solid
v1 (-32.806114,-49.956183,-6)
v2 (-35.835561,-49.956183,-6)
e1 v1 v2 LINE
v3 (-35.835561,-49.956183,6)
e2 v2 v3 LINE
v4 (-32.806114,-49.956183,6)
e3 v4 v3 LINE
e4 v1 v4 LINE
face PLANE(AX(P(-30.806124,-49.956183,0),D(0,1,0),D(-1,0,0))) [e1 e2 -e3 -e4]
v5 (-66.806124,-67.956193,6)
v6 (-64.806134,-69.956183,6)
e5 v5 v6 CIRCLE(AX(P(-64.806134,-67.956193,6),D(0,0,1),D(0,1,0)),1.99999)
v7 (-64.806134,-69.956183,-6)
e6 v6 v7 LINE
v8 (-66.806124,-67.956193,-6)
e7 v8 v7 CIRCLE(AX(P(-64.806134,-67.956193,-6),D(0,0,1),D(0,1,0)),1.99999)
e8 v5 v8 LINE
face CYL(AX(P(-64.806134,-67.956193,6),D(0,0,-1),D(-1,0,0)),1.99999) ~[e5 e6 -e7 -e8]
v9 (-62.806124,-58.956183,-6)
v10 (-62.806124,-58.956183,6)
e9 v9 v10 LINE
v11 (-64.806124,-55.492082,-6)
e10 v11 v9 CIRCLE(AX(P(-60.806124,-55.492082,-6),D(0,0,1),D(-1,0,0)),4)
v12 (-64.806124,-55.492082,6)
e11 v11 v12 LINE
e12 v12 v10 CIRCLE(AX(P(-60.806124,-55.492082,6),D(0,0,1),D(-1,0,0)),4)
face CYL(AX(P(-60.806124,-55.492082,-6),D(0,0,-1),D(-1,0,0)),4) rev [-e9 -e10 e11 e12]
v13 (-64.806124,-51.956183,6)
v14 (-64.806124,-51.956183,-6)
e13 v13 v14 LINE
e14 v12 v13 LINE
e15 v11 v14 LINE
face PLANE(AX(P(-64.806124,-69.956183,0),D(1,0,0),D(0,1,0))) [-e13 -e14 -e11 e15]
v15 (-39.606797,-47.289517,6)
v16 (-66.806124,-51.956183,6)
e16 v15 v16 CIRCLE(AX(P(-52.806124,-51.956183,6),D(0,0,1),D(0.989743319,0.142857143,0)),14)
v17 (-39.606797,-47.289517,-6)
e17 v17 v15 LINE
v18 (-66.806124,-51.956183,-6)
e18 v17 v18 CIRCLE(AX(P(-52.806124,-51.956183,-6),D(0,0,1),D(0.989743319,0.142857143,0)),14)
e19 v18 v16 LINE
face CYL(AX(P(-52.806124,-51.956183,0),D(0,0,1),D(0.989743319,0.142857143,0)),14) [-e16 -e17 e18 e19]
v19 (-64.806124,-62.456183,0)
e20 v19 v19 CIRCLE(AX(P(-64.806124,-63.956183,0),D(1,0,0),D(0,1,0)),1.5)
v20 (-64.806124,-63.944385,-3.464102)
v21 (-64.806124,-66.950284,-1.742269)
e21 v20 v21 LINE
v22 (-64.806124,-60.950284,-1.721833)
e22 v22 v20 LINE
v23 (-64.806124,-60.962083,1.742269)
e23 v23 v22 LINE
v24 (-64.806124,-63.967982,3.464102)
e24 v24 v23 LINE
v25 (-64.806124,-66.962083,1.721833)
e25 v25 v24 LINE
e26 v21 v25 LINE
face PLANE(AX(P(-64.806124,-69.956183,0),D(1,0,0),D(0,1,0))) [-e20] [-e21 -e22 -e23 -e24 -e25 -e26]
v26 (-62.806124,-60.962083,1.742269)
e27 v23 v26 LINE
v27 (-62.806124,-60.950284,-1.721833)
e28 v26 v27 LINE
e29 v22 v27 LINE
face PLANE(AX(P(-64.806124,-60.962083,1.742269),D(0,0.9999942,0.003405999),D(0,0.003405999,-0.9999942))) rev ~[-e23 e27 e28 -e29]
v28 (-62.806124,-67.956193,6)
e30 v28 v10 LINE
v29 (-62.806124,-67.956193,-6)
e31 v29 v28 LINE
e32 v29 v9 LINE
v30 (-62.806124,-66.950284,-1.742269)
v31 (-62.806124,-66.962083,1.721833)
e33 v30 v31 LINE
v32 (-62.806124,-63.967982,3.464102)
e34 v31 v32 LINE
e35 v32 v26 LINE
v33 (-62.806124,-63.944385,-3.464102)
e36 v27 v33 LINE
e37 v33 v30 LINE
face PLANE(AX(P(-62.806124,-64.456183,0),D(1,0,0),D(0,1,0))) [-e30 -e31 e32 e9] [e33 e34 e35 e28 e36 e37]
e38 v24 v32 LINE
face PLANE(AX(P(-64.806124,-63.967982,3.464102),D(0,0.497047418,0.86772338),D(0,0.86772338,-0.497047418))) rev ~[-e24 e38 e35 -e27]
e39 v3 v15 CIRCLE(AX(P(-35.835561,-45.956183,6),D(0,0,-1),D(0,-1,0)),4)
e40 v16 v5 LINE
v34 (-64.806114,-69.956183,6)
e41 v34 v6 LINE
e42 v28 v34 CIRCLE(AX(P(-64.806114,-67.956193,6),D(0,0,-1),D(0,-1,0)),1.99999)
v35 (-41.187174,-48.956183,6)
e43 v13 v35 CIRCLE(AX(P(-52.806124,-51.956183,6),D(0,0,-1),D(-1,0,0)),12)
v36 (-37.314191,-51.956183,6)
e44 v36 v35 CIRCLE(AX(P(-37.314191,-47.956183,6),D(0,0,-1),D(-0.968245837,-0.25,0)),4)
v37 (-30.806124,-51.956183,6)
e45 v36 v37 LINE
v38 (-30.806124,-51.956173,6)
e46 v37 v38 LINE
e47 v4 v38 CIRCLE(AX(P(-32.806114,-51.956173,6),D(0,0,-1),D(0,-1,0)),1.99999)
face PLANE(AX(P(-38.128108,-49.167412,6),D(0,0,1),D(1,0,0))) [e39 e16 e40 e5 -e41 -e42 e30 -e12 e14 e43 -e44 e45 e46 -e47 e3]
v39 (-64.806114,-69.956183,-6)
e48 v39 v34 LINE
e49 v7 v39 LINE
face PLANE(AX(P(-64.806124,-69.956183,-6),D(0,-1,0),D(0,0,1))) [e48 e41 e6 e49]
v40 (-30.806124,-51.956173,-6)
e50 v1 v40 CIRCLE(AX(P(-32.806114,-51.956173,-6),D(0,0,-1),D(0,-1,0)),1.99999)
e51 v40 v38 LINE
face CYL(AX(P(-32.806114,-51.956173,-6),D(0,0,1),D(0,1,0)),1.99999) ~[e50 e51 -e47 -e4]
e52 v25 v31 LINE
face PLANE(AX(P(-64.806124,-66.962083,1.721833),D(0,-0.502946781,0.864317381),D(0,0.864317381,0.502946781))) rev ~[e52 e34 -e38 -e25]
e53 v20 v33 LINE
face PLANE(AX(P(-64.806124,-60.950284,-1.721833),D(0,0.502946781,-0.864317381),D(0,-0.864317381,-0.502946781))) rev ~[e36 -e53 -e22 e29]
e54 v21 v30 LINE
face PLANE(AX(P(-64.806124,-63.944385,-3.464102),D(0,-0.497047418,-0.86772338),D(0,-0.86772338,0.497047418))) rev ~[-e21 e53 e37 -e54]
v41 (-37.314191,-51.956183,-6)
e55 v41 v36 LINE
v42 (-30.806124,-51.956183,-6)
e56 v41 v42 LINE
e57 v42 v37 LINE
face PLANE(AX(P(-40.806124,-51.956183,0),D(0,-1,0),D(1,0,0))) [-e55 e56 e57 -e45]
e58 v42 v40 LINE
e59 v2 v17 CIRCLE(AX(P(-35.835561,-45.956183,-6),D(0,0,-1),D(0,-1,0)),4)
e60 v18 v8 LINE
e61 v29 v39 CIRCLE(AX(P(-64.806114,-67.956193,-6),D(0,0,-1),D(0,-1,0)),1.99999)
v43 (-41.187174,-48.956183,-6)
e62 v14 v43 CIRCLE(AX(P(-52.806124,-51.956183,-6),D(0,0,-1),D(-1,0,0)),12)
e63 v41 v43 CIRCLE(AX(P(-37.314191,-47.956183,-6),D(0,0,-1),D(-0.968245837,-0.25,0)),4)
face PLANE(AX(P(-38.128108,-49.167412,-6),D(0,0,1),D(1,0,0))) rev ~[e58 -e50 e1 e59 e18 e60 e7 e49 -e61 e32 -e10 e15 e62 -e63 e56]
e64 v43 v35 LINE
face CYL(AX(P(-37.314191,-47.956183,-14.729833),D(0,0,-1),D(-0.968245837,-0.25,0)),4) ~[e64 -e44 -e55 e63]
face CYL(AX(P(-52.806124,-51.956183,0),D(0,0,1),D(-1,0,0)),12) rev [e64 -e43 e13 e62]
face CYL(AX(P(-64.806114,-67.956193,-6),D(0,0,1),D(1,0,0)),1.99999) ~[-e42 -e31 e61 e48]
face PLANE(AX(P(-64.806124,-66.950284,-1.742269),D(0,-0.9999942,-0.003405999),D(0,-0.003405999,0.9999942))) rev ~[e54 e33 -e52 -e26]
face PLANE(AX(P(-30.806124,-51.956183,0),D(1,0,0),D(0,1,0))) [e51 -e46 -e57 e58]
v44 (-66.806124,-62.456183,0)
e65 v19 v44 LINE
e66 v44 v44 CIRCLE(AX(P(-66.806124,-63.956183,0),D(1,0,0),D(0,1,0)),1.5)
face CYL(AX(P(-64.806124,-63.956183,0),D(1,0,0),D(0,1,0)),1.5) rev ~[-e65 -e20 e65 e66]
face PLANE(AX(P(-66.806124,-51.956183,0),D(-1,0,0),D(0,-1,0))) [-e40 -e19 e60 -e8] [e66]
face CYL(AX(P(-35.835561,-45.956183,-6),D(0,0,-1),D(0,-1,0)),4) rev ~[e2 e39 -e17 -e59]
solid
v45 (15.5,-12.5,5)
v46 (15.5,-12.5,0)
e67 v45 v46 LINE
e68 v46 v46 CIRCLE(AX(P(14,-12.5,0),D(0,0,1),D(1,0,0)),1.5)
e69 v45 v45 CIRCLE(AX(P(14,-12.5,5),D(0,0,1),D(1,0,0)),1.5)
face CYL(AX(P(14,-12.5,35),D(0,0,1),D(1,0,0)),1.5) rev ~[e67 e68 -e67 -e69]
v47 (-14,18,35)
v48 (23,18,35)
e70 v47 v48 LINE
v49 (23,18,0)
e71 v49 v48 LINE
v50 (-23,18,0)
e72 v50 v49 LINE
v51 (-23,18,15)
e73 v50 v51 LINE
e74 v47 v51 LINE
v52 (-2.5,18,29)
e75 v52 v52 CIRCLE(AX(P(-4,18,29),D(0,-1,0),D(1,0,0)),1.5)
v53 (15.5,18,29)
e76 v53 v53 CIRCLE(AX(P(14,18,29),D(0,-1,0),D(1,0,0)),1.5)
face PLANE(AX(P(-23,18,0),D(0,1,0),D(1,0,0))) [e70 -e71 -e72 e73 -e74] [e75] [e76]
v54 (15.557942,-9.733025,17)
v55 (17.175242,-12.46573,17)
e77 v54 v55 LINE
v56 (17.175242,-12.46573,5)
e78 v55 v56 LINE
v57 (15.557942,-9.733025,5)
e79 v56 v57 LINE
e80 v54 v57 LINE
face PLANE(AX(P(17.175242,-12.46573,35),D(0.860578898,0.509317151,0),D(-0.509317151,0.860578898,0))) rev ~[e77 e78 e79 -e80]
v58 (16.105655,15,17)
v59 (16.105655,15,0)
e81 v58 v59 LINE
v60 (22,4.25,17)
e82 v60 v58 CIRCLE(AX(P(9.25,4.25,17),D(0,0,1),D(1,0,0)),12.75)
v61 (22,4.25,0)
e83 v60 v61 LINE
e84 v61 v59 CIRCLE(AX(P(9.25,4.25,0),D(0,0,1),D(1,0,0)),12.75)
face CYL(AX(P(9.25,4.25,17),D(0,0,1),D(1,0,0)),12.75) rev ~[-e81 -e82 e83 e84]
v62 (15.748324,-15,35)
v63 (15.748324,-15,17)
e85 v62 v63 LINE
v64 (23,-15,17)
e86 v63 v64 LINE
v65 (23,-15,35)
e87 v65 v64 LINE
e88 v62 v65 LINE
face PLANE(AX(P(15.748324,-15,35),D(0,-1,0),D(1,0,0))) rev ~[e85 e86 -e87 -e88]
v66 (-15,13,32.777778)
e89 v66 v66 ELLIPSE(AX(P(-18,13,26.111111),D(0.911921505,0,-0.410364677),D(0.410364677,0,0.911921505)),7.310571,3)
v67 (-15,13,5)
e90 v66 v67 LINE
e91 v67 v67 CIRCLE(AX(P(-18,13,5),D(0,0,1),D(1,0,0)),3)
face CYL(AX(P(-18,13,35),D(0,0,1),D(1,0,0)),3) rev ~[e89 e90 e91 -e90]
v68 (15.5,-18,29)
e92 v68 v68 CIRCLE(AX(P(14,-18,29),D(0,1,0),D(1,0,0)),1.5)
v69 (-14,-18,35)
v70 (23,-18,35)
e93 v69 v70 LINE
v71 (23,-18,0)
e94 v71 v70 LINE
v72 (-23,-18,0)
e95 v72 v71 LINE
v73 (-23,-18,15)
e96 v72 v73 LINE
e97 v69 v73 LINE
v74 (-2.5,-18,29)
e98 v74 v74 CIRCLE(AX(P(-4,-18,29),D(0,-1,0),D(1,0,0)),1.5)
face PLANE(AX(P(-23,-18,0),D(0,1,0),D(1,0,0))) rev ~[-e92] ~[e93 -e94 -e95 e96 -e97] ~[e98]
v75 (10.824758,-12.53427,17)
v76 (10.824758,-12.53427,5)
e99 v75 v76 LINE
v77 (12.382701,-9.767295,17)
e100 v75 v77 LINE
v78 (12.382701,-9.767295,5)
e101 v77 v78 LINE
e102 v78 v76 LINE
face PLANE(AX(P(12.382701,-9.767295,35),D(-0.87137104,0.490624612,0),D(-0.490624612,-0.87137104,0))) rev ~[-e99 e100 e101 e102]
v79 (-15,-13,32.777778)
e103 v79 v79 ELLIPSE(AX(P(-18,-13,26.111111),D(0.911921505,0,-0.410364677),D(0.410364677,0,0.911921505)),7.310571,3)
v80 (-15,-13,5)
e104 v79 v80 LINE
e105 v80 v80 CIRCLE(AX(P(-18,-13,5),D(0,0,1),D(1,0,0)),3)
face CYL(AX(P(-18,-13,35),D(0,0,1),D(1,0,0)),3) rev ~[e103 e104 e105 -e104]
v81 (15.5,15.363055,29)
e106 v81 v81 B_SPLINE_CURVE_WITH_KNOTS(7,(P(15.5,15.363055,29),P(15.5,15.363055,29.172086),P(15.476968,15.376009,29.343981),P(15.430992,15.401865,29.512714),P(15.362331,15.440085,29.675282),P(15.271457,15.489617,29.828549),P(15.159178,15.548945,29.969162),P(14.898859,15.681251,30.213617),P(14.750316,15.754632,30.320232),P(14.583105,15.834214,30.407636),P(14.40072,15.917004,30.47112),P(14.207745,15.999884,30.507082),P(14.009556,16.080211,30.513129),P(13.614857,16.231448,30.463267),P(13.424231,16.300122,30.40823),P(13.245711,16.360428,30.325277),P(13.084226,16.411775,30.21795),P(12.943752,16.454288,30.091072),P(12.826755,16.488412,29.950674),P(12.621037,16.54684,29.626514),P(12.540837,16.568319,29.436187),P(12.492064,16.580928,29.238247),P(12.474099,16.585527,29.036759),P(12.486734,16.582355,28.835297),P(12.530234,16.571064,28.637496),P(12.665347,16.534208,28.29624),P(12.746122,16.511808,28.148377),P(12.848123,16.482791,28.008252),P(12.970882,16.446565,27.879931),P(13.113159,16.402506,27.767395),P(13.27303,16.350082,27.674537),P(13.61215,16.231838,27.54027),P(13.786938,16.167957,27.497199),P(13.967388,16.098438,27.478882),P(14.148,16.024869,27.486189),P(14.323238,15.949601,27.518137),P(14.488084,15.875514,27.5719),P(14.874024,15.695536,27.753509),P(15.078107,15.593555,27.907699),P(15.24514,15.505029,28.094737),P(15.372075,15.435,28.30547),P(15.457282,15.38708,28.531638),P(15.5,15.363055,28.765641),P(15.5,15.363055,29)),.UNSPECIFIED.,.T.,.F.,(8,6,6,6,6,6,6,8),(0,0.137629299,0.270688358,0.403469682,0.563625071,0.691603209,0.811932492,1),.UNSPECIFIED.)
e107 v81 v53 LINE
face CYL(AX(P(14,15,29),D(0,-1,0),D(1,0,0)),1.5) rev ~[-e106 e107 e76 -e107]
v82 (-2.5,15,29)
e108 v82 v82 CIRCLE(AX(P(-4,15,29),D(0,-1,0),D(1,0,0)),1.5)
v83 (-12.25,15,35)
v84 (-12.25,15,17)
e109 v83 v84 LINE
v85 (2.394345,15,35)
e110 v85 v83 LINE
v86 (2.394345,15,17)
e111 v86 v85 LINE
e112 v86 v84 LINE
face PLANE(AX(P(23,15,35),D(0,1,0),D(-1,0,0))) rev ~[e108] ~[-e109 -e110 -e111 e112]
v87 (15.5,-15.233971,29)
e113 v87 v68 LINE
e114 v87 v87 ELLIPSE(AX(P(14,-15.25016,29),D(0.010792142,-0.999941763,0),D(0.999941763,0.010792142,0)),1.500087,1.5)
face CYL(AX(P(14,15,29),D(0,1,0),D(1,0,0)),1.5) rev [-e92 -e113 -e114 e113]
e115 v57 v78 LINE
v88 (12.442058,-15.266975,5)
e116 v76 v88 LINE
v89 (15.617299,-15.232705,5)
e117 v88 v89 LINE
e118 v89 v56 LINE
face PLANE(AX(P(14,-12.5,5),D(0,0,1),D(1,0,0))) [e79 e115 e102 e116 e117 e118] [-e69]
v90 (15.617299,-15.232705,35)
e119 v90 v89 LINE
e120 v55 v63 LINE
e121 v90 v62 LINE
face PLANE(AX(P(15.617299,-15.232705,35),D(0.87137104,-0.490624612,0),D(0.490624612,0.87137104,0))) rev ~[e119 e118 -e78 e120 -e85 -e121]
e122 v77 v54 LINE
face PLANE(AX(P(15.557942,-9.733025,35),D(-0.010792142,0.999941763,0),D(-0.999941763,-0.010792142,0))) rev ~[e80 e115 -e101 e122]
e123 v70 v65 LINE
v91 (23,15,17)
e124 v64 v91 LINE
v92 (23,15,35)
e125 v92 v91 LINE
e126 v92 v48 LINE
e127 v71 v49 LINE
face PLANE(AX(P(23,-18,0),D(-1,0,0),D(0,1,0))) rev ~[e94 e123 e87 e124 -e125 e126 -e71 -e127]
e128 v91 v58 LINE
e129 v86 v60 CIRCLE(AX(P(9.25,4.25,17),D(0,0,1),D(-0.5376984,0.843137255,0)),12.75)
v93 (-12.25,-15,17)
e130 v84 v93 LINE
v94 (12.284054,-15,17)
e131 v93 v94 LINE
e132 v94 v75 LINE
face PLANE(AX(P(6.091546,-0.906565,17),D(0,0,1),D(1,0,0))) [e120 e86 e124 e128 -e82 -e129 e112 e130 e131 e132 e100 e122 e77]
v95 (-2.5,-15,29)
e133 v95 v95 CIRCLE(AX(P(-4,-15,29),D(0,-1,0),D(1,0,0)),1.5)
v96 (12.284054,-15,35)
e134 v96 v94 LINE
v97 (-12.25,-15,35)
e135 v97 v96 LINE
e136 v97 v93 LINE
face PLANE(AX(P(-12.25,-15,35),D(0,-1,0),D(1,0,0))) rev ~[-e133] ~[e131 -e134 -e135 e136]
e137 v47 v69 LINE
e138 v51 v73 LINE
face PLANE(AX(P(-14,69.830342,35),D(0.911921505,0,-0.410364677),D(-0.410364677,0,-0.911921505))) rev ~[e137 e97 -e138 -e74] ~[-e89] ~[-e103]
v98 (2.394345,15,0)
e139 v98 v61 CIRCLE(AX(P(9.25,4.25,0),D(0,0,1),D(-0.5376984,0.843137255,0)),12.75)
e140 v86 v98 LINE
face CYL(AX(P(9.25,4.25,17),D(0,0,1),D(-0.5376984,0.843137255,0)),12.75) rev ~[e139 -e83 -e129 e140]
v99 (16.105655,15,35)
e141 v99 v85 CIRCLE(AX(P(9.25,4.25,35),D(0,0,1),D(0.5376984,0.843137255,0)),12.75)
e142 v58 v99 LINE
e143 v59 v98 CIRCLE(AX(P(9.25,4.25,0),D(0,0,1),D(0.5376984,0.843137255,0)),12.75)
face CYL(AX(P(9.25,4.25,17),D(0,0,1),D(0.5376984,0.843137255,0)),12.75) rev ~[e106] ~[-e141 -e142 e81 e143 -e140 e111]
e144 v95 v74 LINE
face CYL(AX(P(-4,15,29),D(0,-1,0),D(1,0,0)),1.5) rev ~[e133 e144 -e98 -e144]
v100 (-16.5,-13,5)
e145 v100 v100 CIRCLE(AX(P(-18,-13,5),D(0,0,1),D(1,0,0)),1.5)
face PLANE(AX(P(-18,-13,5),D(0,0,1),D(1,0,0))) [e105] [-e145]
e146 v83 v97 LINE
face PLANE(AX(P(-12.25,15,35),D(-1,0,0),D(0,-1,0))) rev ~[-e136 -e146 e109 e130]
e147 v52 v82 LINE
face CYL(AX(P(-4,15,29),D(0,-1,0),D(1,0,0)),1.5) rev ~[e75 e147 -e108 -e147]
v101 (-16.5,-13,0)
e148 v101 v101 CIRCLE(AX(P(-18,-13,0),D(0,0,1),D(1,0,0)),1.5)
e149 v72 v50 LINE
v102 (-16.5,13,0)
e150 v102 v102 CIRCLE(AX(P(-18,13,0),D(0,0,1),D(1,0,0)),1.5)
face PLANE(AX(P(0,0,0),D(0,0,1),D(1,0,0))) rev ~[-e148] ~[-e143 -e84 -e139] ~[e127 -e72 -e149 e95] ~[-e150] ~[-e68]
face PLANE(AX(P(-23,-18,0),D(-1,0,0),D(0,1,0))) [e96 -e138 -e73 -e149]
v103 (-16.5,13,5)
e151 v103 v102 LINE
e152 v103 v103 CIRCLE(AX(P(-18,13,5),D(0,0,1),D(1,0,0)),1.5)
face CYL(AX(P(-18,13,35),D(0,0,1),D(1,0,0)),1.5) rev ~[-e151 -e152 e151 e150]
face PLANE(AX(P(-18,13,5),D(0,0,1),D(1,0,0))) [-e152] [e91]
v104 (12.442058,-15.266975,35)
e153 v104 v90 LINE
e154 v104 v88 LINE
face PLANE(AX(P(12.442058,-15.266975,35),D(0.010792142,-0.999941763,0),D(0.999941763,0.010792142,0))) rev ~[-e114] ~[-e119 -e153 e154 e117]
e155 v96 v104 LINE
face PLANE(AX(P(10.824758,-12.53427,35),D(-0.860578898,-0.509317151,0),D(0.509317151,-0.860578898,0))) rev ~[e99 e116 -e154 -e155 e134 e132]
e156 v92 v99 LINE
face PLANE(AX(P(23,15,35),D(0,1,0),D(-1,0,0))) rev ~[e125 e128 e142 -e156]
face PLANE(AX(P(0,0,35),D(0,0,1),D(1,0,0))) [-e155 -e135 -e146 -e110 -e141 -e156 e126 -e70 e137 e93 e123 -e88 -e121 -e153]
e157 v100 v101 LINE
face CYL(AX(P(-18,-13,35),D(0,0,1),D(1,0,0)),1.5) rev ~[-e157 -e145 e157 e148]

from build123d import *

# Parameters (mm, degrees)
F0_W         = 46
F0_H         = 36
F1_DEPTH     = 35
F2_R         = 1.5
F3_DEPTH     = 50
F2_R_2       = 3
F4_DEPTH     = 30
F6_DEPTH     = 18
F8_DEPTH     = 25
F9_R         = 1.5
F10_DEPTH    = 50
F11_T1_DEPTH = 139.6606830198
F13_DEPTH    = 6
F14_W        = 11
F14_H        = 12
F15_DEPTH    = 2
F14_R        = 1.5
F16_DEPTH    = 25
F17_T1_DEPTH = 12
F17_T3_DEPTH = 12
F17_T5_DEPTH = 29.4596669241
F18_R        = 1.99999


# Not quite as in the source:
# - a fillet or chamfer that OpenCascade refuses, or shapes differently, is made with other operations: its cross-section is extruded or revolved along the edge and cut away or added
# - a fillet or chamfer is up to 0.001 mm smaller than in the source, because OpenCascade refuses the exact size
# - a feature names something its author has since deleted; it is built from what else it names


with BuildPart() as f1:
    # F0 (on Top) → F1 (new body)
    with BuildSketch(Plane.XY):
        Rectangle(F0_W, F0_H)
    extrude(amount=F1_DEPTH)

    # F2 (on face) → F3 (cut)
    with BuildSketch(Plane.XY.offset(35)):
        with Locations((-18, 13)):
            Circle(F2_R)
        with Locations((-18, -13)):
            Circle(F2_R)
        with Locations((14, -12.5)):
            Circle(F2_R)
    extrude(amount=-F3_DEPTH, mode=Mode.SUBTRACT)

    # F2 (on face) → F4 (cut)
    with BuildSketch(Plane.XY.offset(35)):
        with Locations((-18, 13)):
            Circle(F2_R_2)
        with Locations((-18, 13)):
            Circle(F2_R, mode=Mode.SUBTRACT)
        with Locations((-18, -13)):
            Circle(F2_R_2)
        with Locations((-18, -13)):
            Circle(F2_R, mode=Mode.SUBTRACT)
        Polygon((10.8247584463, -12.5342696548), (12.4420576148, -15.266974676), (15.6172991685, -15.2327050212), (17.1752415537, -12.4657303452), (15.5579423852, -9.733025324), (12.3827008315, -9.7672949788), align=None)
        with Locations((14, -12.5)):
            Circle(F2_R, mode=Mode.SUBTRACT)
    extrude(amount=-F4_DEPTH, mode=Mode.SUBTRACT)

    # F5 (on face) → F6 (cut)
    with BuildSketch(Plane.XY.offset(35)):
        Polygon((15.7483235031, -15), (23, -15), (23, 15), (-12.25, 15), (-12.25, -15), (12.2840537621, -15), (10.8247584463, -12.5342696548), (12.3827008315, -9.7672949788), (15.5579423852, -9.733025324), (17.1752415537, -12.4657303452), align=None)
    extrude(amount=-F6_DEPTH, mode=Mode.SUBTRACT)

    # F7 (on face) → F8 (cut, symmetric)
    with BuildSketch(Plane.XY.offset(17)):
        with BuildLine():
            Line((2.3943453996, 15), (16.1056546004, 15))
            ThreePointArc((16.1056546004, 15), (9.25, 17), (2.3943453996, 15))
        make_face()
        with BuildLine():
            ThreePointArc((2.3943453996, 15), (3.120036548, -6.9297159211), (22, 4.25))
            ThreePointArc((22, 4.25), (20.4297159211, 10.379963452), (16.1056546004, 15))
            Line((16.1056546004, 15), (2.3943453996, 15))
        make_face()
    extrude(amount=F8_DEPTH, both=True, mode=Mode.SUBTRACT)

    # F9 (on face) → F10 (cut, symmetric)
    with BuildSketch(Plane.XZ.offset(-15)):
        with Locations((14, 29)):
            Circle(F9_R)
        with Locations((-4, 29)):
            Circle(F9_R)
    extrude(amount=F10_DEPTH, both=True, mode=Mode.SUBTRACT)

    # F11: chamfer of 9 x 20 on 1 edges, made by hand

    # F11_s2 → F11_t1 (cut)
    with BuildSketch(Plane.XZ.offset(-69.8303415099)):
        Polygon((-14, 35), (-23, 15), (-23, 35), align=None)
    extrude(amount=F11_T1_DEPTH, mode=Mode.SUBTRACT)


with BuildPart() as f13:
    # F12 (on Top) → F13 (new body, symmetric)
    with BuildSketch(Plane.XY):
        with BuildLine():
            ThreePointArc((-64.8061240633, -51.9561834335), (-52.8061240633, -39.9561834335), (-40.8061240633, -51.9561834335))
            Line((-40.8061240633, -51.9561834335), (-40.8061240633, -49.9561834335))
            Line((-40.8061240633, -49.9561834335), (-38.9497176027, -49.9561834335))
            ThreePointArc((-38.9497176027, -49.9561834335), (-53.8086981384, -37.9921279616), (-66.8061240633, -51.9561834335))
            Line((-66.8061240633, -51.9561834335), (-64.8061240633, -51.9561834335))
        make_face()
        with BuildLine():
            ThreePointArc((-38.9497176027, -49.9561834335), (-38.8420685913, -50.9536093584), (-38.8061240633, -51.9561834335))
            Line((-38.8061240633, -51.9561834335), (-30.8061240633, -51.9561834335))
            Line((-30.8061240633, -51.9561834335), (-30.8061240633, -49.9561834335))
            Line((-30.8061240633, -49.9561834335), (-38.9497176027, -49.9561834335))
        make_face()
        with BuildLine():
            Line((-40.8061240633, -49.9561834335), (-40.8061240633, -51.9561834335))
            Line((-40.8061240633, -51.9561834335), (-38.8061240633, -51.9561834335))
            ThreePointArc((-38.8061240633, -51.9561834335), (-38.8420685913, -50.9536093584), (-38.9497176027, -49.9561834335))
            Line((-38.9497176027, -49.9561834335), (-40.8061240633, -49.9561834335))
        make_face()
        with BuildLine():
            Line((-64.8061240633, -59.1672859845), (-64.8061240633, -51.9561834335))
            Line((-64.8061240633, -51.9561834335), (-66.8061240633, -51.9561834335))
            ThreePointArc((-66.8061240633, -51.9561834335), (-66.2968616265, -55.6978408203), (-64.8061240633, -59.1672859845))
        make_face()
        with BuildLine():
            ThreePointArc((-64.8061240633, -59.1672859845), (-66.2968616265, -55.6978408203), (-66.8061240633, -51.9561834335))
            Line((-66.8061240633, -51.9561834335), (-66.8061240633, -69.9561834335))
            Line((-66.8061240633, -69.9561834335), (-64.8061240633, -69.9561834335))
            Line((-64.8061240633, -69.9561834335), (-64.8061240633, -59.1672859845))
        make_face()
    extrude(amount=F13_DEPTH, both=True)

    # F14 (on face) → F15 (join)
    with BuildSketch(Plane.YZ.offset(-64.8061240633)):
        with Locations((-64.4561834335, 0)):
            Rectangle(F14_W, F14_H)
        Polygon((-60.9620828312, 1.742268864), (-60.9502840359, -1.7218327511), (-63.9443846382, -3.4641016151), (-66.9502840359, -1.742268864), (-66.9620828312, 1.7218327511), (-63.9679822288, 3.4641016151), align=None, mode=Mode.SUBTRACT)
    extrude(amount=F15_DEPTH)

    # F14 (on face) → F16 (cut)
    with BuildSketch(Plane.YZ.offset(-64.8061240633)):
        with Locations((-63.9561834335, 0)):
            Circle(F14_R)
    extrude(amount=-F16_DEPTH, mode=Mode.SUBTRACT)

    # F17: fillet of radius 4 on 3 edges, made by hand

    # F17_s2 → F17_t1 (join)
    with BuildSketch(Plane.XY.offset(-6)):
        with BuildLine():
            ThreePointArc((-64.8061240633, -55.4920818184), (-64.2702256784, -57.4920818184), (-62.8061240633, -58.9561834335))
            Line((-62.8061240633, -58.9561834335), (-64.8061240633, -58.9561834335))
            Line((-64.8061240633, -58.9561834335), (-64.8061240633, -55.4920818184))
        make_face()
    extrude(amount=F17_T1_DEPTH)

    # F17_s4 → F17_t3 (join)
    with BuildSketch(Plane.XY.offset(-6)):
        with BuildLine():
            ThreePointArc((-35.8355613148, -49.9561834335), (-38.1449623915, -49.2221697572), (-39.6067974811, -47.2895167669))
            ThreePointArc((-39.6067974811, -47.2895167669), (-39.2127083631, -48.6066984578), (-38.9497176027, -49.9561834335))
            Line((-38.9497176027, -49.9561834335), (-35.8355613148, -49.9561834335))
        make_face()
    extrude(amount=F17_T3_DEPTH)

    # F17_s6 → F17_t5 (cut)
    with BuildSketch(Plane.XY.offset(-14.7298334621)):
        with BuildLine():
            ThreePointArc((-41.1871740246, -48.9561834335), (-39.7636804212, -51.1184610937), (-37.3141906784, -51.9561834335))
            Line((-37.3141906784, -51.9561834335), (-40.8061240633, -51.9561834335))
            ThreePointArc((-40.8061240633, -51.9561834335), (-40.9017677081, -50.4441319237), (-41.1871740246, -48.9561834335))
        make_face()
    extrude(amount=F17_T5_DEPTH, mode=Mode.SUBTRACT)

    # F18 (radius 2 in the source; OpenCascade refuses exactly that, so slightly less here)
    f18_edges = [f13.edges().sort_by_distance(p)[0] for p in [
        (-66.806124, -69.956183, 0),
        (-62.806124, -69.956183, 0),
        (-30.806124, -49.956183, 0),
    ]]
    fillet(f18_edges, radius=F18_R)


solid = Compound([f1.part, f13.part])
